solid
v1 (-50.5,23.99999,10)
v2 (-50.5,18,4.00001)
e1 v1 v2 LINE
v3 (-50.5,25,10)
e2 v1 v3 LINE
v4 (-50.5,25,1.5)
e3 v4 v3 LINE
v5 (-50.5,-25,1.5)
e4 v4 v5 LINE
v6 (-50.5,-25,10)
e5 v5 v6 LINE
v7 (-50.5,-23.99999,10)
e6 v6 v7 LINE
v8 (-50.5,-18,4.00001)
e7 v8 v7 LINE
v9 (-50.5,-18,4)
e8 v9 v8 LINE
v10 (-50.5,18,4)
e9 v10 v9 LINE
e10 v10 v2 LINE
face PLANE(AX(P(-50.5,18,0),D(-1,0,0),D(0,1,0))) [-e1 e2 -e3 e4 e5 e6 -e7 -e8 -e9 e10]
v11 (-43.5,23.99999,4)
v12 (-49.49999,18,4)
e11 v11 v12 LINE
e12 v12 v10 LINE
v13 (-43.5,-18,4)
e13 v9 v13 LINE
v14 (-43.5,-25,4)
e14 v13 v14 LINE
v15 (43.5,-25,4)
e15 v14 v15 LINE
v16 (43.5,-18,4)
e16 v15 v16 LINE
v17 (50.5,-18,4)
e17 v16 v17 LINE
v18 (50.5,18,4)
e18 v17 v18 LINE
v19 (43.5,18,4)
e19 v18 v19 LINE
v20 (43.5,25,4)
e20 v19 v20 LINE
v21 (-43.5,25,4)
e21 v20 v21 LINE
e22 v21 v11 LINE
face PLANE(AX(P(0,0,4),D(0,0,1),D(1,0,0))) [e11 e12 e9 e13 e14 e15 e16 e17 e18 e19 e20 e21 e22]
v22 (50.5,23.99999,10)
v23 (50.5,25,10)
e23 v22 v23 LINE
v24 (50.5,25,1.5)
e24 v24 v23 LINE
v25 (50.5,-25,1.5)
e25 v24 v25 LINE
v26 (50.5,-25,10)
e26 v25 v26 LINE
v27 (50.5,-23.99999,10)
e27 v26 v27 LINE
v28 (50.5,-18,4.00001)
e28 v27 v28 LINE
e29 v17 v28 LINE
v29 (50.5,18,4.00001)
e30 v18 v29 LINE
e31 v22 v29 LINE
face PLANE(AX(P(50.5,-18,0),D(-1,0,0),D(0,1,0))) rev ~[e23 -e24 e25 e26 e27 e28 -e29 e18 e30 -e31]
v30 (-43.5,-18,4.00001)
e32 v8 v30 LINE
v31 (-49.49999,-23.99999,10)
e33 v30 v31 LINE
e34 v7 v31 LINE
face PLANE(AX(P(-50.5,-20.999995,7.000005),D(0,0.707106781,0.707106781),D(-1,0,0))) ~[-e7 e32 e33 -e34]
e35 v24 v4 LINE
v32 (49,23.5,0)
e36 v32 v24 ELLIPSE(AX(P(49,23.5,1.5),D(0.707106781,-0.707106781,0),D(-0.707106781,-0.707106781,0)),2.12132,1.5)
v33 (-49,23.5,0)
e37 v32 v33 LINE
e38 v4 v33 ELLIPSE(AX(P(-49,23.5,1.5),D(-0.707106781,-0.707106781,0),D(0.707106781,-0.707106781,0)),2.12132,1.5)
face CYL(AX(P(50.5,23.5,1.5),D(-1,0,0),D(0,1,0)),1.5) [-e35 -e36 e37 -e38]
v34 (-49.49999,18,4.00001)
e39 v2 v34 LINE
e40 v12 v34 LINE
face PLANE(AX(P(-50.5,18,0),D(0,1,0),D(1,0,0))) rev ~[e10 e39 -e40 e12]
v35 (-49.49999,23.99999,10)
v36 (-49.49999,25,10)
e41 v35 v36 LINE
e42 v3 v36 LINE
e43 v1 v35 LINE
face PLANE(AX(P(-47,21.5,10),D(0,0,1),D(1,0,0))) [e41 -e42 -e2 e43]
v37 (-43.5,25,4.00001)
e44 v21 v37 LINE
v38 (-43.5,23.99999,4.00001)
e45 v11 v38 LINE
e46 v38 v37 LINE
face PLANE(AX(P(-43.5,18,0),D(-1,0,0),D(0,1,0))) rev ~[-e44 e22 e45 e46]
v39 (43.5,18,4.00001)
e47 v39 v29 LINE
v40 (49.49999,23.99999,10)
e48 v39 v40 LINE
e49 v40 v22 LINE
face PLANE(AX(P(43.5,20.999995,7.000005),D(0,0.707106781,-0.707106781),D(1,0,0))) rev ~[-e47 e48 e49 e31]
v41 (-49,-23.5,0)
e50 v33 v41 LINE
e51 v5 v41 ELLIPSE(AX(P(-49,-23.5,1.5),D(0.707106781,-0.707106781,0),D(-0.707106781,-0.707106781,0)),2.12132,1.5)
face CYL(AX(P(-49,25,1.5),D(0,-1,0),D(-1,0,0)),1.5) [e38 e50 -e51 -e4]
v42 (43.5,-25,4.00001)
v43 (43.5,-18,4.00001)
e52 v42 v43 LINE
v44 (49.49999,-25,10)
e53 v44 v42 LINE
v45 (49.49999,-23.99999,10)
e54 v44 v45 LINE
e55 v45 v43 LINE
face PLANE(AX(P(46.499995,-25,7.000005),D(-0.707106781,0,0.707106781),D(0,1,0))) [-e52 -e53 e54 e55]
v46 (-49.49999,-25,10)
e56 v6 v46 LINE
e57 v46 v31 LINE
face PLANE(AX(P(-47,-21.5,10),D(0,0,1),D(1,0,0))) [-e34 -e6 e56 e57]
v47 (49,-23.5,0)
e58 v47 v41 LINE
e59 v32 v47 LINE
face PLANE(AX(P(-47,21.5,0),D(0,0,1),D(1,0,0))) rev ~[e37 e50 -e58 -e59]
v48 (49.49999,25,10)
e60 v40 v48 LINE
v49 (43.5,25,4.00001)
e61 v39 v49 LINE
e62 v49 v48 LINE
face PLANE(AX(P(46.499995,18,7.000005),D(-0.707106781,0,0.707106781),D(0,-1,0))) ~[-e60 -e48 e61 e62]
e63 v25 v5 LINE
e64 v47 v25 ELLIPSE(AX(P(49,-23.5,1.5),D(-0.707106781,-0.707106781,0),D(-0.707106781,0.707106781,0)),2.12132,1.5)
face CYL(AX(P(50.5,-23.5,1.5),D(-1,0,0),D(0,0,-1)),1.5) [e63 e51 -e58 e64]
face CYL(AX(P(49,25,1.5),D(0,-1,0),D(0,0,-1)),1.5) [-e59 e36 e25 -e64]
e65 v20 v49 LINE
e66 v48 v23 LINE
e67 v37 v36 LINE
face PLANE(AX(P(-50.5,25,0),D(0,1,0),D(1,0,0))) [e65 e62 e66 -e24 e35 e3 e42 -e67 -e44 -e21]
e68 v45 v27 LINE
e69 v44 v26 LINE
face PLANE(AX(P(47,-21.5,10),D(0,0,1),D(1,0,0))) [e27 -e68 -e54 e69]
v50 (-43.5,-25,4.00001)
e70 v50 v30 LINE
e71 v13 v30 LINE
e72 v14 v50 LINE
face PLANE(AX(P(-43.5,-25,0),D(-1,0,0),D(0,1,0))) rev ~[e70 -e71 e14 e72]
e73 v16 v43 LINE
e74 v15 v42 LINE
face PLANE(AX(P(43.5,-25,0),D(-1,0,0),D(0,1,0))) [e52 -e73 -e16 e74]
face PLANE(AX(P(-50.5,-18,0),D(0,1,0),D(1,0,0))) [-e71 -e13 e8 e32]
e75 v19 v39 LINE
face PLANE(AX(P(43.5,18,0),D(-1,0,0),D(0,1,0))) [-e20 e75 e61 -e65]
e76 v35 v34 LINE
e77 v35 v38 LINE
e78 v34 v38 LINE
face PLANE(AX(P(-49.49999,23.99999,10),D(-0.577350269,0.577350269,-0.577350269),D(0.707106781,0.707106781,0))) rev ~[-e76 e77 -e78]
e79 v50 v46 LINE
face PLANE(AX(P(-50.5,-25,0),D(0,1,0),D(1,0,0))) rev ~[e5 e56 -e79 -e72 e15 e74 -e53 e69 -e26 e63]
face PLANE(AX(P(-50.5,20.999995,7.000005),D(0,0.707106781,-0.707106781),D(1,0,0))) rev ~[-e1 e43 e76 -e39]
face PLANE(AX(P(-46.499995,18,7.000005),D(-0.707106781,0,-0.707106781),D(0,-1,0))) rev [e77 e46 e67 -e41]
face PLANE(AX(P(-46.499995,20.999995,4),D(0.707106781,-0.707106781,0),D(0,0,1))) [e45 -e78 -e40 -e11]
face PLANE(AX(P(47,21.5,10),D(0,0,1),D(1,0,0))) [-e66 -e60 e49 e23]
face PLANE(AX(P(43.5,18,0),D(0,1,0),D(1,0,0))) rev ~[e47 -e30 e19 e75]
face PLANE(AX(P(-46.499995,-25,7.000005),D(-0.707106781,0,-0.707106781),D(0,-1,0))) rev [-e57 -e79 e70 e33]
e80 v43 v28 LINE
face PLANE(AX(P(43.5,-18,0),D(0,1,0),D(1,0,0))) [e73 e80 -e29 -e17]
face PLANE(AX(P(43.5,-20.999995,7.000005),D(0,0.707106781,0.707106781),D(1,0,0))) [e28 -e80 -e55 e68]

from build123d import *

# Parameters (mm, degrees)
F1_DEPTH = 4
F0_W     = 7
F0_H     = 7
F2_DEPTH = 10
F3_SIZE  = 5.99999
F4_R     = 1.5


# Not quite as in the source:
# - a fillet or chamfer is up to 0.001 mm smaller than in the source, because OpenCascade refuses the exact size


with BuildPart() as f1:
    # F0 (on Top) → F1 (new body)
    with BuildSketch(Plane.XY):
        Polygon((43.5, 25), (-43.5, 25), (-43.5, 18), (-50.5, 18), (-50.5, -18), (-43.5, -18), (-43.5, -25), (43.5, -25), (43.5, -18), (50.5, -18), (50.5, 18), (43.5, 18), align=None)
    extrude(amount=F1_DEPTH)

    # F0 (on Top) → F2 (join)
    with BuildSketch(Plane.XY):
        with Locations((-47, 21.5)):
            Rectangle(F0_W, F0_H)
        with Locations((-47, -21.5)):
            Rectangle(F0_W, F0_H)
        with Locations((47, 21.5)):
            Rectangle(F0_W, F0_H)
        with Locations((47, -21.5)):
            Rectangle(F0_W, F0_H)
    extrude(amount=F2_DEPTH)

    # F3 (size 6 in the source; OpenCascade refuses exactly that, so slightly less here)
    f3_edges = [f1.edges().sort_by_distance(p)[0] for p in [
        (-43.5, 18, 7),
        (-47, 18, 10),
        (-43.5, 21.5, 10),
        (43.5, 21.5, 10),
        (47, 18, 10),
        (47, -18, 10),
        (43.5, -21.5, 10),
        (-43.5, -21.5, 10),
        (-47, -18, 10),
    ]]
    chamfer(f3_edges, length=F3_SIZE)

    # F4
    f4_edges = [f1.edges().sort_by_distance(p)[0] for p in [
        (-50.5, 0, 0),
        (0, -25, 0),
        (50.5, 0, 0),
        (0, 25, 0),
    ]]
    fillet(f4_edges, radius=F4_R)


solid = f1.part
